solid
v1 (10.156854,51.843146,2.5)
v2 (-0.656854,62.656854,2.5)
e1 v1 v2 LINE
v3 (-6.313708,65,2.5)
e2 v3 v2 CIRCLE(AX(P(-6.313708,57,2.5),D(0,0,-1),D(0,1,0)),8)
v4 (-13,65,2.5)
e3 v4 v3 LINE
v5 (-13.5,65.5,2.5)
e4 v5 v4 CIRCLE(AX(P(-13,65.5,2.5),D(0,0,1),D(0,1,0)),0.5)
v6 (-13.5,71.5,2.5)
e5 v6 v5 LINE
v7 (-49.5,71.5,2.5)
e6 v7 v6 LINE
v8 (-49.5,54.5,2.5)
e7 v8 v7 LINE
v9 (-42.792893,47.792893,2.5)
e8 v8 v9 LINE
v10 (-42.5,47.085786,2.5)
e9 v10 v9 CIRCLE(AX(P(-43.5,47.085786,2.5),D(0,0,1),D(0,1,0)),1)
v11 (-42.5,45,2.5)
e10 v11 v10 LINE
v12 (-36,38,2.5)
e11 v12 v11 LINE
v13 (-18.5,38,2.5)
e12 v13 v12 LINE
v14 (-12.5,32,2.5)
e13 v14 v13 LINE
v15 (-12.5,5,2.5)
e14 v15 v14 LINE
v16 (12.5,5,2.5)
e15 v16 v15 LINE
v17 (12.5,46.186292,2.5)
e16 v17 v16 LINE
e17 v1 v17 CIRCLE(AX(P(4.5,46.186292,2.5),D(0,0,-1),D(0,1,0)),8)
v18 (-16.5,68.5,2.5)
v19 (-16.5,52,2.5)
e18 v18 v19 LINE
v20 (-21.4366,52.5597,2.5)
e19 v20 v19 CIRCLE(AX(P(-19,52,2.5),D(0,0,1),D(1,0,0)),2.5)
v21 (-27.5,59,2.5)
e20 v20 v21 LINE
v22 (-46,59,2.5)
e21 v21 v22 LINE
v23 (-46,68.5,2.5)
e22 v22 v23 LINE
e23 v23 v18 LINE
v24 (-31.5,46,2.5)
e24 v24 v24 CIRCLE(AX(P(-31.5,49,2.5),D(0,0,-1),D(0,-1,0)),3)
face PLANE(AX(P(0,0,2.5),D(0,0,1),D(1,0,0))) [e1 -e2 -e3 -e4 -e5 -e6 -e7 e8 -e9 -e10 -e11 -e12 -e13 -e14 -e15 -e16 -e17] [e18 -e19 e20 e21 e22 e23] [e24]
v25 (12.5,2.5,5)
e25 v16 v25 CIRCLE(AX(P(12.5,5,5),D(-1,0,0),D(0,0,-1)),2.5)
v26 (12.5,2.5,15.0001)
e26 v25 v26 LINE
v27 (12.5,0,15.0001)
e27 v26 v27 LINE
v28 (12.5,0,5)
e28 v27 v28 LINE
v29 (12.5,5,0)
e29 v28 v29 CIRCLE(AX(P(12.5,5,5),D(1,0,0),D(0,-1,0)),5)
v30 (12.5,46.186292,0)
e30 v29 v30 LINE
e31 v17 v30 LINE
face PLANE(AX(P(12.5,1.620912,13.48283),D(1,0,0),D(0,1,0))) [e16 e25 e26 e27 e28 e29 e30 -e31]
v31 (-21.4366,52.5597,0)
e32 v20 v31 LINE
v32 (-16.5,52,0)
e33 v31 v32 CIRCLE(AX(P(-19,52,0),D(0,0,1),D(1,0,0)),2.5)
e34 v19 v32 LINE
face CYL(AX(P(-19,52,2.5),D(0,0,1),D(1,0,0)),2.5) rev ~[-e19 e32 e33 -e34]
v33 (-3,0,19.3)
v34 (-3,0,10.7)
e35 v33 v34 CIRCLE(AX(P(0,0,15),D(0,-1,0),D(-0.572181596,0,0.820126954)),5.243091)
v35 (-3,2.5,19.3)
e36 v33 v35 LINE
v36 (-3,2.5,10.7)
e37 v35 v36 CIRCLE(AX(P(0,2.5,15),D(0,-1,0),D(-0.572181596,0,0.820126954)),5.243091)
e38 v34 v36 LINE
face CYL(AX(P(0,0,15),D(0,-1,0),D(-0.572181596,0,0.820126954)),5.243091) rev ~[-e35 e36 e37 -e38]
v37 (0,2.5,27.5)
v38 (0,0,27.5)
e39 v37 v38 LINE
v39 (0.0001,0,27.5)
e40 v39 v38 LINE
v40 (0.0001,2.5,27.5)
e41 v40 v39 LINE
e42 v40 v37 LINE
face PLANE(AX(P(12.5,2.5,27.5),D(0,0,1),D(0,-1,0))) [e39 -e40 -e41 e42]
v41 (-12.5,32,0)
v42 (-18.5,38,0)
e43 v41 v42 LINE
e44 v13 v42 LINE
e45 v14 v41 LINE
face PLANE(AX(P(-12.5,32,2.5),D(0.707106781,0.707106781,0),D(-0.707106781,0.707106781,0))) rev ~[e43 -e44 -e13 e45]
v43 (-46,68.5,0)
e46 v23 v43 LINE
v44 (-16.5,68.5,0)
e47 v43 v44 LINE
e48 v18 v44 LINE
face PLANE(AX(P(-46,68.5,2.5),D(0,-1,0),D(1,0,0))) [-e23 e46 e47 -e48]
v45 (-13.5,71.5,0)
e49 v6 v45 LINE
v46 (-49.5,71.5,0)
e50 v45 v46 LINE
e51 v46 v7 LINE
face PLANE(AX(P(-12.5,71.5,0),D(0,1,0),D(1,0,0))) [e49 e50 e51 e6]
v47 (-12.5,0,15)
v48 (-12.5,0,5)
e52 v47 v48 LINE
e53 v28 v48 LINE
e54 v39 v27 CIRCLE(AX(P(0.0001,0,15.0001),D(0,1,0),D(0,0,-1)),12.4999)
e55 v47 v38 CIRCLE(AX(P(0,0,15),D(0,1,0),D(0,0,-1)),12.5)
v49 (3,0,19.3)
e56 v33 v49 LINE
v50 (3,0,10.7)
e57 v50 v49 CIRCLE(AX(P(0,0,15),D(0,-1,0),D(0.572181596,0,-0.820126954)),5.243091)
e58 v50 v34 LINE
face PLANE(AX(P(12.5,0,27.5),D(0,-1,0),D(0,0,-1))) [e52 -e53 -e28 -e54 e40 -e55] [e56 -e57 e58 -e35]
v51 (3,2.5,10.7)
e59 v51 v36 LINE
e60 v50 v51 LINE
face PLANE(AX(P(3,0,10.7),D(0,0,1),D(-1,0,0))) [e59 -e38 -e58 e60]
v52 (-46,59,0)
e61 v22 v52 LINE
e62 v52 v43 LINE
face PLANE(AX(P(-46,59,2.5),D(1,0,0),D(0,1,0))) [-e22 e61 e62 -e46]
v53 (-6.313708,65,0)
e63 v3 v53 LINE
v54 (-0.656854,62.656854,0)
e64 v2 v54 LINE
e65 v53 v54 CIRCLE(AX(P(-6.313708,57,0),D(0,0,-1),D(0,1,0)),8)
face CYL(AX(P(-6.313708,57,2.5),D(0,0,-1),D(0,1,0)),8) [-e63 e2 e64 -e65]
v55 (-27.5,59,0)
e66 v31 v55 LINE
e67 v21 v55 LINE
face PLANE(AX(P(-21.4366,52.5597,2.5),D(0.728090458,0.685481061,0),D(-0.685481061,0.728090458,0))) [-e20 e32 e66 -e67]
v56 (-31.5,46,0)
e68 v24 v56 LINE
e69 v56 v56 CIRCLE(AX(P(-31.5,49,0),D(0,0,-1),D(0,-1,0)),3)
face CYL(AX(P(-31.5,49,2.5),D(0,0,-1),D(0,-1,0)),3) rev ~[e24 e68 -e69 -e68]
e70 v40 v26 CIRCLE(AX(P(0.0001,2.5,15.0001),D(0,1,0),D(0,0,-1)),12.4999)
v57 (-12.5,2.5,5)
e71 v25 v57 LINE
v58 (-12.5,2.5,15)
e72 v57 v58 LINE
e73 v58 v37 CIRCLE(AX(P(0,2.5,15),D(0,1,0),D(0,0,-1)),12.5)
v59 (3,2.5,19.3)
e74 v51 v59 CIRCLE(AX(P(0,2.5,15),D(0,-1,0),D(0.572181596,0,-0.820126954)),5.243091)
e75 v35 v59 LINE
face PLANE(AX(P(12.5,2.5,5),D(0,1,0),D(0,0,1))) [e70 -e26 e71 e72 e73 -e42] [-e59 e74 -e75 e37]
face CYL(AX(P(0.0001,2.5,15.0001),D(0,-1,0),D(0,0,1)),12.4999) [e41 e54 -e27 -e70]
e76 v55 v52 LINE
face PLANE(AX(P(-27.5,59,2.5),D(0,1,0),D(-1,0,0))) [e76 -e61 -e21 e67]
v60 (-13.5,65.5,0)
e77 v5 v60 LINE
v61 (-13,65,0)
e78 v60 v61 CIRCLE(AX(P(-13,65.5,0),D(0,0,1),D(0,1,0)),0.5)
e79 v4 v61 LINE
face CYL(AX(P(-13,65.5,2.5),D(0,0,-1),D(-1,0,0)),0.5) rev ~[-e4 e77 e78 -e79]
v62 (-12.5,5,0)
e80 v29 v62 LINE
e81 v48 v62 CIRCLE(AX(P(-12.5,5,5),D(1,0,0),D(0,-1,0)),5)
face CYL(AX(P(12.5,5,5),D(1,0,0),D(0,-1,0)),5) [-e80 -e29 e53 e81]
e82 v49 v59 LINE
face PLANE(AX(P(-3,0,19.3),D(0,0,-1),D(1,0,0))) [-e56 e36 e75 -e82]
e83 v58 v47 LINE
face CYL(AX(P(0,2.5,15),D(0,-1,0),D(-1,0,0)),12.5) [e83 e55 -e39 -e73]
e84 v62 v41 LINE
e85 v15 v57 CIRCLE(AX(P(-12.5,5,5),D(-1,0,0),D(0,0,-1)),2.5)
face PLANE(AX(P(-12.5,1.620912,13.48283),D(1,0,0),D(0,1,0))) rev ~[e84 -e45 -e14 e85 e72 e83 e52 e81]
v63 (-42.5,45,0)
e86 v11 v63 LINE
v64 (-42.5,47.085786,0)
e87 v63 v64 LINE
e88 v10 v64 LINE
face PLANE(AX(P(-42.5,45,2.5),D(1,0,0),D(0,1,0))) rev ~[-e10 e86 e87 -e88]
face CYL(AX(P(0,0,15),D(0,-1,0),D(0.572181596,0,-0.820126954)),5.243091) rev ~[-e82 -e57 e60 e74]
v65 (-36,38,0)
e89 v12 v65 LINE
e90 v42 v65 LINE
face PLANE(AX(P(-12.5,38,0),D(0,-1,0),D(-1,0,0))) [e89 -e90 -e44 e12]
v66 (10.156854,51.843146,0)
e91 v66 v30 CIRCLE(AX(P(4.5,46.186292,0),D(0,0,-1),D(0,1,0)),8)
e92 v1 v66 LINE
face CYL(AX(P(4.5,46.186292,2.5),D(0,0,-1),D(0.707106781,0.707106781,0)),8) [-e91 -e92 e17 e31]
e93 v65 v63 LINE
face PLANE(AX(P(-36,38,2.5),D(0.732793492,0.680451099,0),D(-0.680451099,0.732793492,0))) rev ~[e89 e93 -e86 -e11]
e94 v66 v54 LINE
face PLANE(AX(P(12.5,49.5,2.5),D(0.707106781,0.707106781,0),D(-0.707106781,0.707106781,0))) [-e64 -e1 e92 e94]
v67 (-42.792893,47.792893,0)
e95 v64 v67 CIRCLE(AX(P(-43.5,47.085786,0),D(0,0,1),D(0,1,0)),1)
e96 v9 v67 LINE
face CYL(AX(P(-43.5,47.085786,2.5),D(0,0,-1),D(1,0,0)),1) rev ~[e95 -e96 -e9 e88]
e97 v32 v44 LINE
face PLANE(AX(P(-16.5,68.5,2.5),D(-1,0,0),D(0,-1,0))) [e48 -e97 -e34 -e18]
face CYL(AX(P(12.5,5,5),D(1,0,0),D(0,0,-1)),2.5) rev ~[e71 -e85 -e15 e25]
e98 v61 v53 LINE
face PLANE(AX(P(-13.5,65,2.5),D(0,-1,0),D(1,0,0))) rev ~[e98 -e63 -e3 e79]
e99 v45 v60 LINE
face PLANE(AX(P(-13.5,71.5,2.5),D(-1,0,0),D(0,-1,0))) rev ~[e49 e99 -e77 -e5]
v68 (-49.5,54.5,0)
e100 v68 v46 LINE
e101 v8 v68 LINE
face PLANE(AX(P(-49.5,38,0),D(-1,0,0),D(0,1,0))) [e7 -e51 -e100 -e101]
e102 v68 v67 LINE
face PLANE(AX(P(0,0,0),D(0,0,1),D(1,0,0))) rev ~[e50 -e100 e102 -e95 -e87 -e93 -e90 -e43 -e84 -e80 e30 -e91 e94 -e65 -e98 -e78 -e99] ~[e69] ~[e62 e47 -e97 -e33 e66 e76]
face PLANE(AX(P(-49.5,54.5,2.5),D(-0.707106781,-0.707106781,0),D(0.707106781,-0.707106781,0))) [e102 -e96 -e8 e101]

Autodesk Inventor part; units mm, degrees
ref_plane "YZ Plane" through (0, 0, 0) normal (1, 0, 0) x (0, 1, 0)
ref_plane "XZ Plane" through (0, 0, 0) normal (0, 1, 0) x (-1, 0, 0)
ref_plane "XY Plane" through (0, 0, 0) normal (0, 0, 1) x (1, 0, 0)
sketch "Sketch1" plane through (0, 0, 0) normal (0, 0, 1) x (1, 0, 0)
  line L0 (-12.5, 71.5) -> (12.5, 71.5)
  line L1 (12.5, 71.5) -> (12.5, 0)
  line L2 (12.5, 0) -> (-12.5, 0)
  line L3 (-12.5, 0) -> (-12.5, 71.5)
  line L4 (-49.5, 71.5) -> (12.5, 71.5)
  line L5 (12.5, 71.5) -> (12.5, 38)
  line L6 (12.5, 38) -> (-49.5, 38)
  line L7 (-49.5, 38) -> (-49.5, 71.5)
  point P0 (0, 0)
  point P1 (0, 0)
  dimension "d0" = 25
  dimension "d1" = 71.5
  dimension "d2" = 62
  dimension "d3" = 33.5
extrude "Plate1" add sketch "Sketch1" along normal blind 2.5
sketch "Sketch2" plane through (12.5, 2.5, 0) normal (0, -1, 0) x (1, 0, 0)
  line L0 (-25, 0) -> (0, 0)
  line L1 (0, 0) -> (0, 27.5)
  line L2 (0, 27.5) -> (-25, 27.5)
  line L3 (-25, 27.5) -> (-25, 0)
edge flange "Flange1" height 27.5 angle 90 thickness 2.5 bend radius 2.5 thickness toward (0, -1, 0) relief tear relief width 2.5 relief depth 1.25 edges at (0, 0, 2.5) wall of the first edge with corners at (-12.5, 2.5, 0) (12.5, 2.5, 0) (12.5, 2.5, 27.5) (-12.5, 2.5, 27.5)
bend "Bend1"
corner "Corner1"
fillet "Fillet1" radius 12.5 1 edges at (-12.5, 1.25, 27.5)
fillet "Fillet2" radius 12.5 1 edges at (12.5, 1.25, 27.5)
sketch "Sketch5" plane through (-12.5, 0, 5) normal (0, -1, 0) x (1, 0, 0)
  line L0 (9.5, 14.3) -> (15.5, 14.3)
  line L1 (15.5, 14.3) -> (15.5, 5.7)
  line L2 (15.5, 5.7) -> (9.5, 5.7)
  line L3 (9.5, 5.7) -> (9.5, 14.3)
  arc A0 (25, 10) -> (0, 10) centre (12.5, 10) ccw projected
  arc A1 (9.5, 14.3) -> (9.5, 5.7) centre (12.5, 10) ccw
  arc A2 (15.5, 5.7) -> (15.5, 14.3) centre (12.5, 10) ccw
  line L4 (9.5, 5.7) -> (9.5, 14.3)
  line L5 (15.5, 5.7) -> (15.5, 14.3)
  point P0 (12.5, -5)
  point P1 (12.5, 14.3)
  point P2 (12.5, 22.5)
  dimension "d20" = 8.6
  dimension "d21" = 6
extrude "Cut1" cut sketch "Sketch5" against normal blind 2.5
sketch "Sketch6" plane through (0, 0, 2.5) normal (0, 0, 1) x (1, 0, 0)
  line L0 (12.5, 71.5) -> (-49.5, 71.5) projected
  line L1 (12.5, 71.5) -> (-13.5, 71.5)
  line L2 (-13.5, 71.5) -> (-13.5, 65)
  line L3 (-13.5, 65) -> (12.5, 65)
  line L4 (12.5, 65) -> (12.5, 71.5)
  line L5 (-3, 65) -> (12.5, 65)
  line L6 (12.5, 65) -> (12.5, 49.5)
  line L7 (12.5, 49.5) -> (-3, 65)
  point P0 (0, 0)
  dimension "d24" = 26
  dimension "d25" = 6.5
  dimension "d26" = 15.5
  dimension "d27" = 15.5
extrude "Cut2" cut sketch "Sketch6" against normal blind 2.5
fillet "Fillet3" radius 0.5 1 edges at (-13.5, 65, 1.25)
fillet "Fillet4" radius 8 2 edges at (-3, 65, 1.25) (12.5, 49.5, 1.25)
sketch "Sketch7" plane through (0, 0, 2.5) normal (0, 0, 1) x (1, 0, 0)
  line L0 (-12.5, 38) -> (-49.5, 38)
  line L1 (-12.5, 38) -> (-18.5, 38)
  line L2 (-12.5, 38) -> (-12.5, 32)
  line L3 (-12.5, 5) -> (-12.5, 38)
  line L4 (-12.5, 32) -> (-18.5, 38)
  point P0 (0, 0)
  dimension "d32" = 6
  dimension "d33" = 6
sheet face with bend "Face2" sketch "Sketch7" thickness 2.5 toward (0, 0, -1) bend radius 2.5
bend "Bend2"
sketch "Sketch8" plane through (0, 0, 2.5) normal (0, 0, 1) x (1, 0, 0)
  line L0 (-49.5, 71.5) -> (-49.5, 38) projected
  line L1 (-49.5, 38) -> (-36, 38)
  line L2 (-18.5, 38) -> (-49.5, 38) projected
  line L3 (-49.5, 38) -> (-49.5, 54.5)
  line L4 (-49.5, 54.5) -> (-43, 54.5)
  line L5 (-49.5, 54.5) -> (-49.5, 47.5)
  line L6 (-49.5, 54.5) -> (-42.5, 47.5)
  line L7 (-36, 38) -> (-42.5, 38)
  line L8 (-36, 38) -> (-36, 45)
  line L9 (-36, 38) -> (-42.5, 45)
  line L10 (-42.5, 45) -> (-42.5, 47.5)
  point P0 (0, 0)
  dimension "d39" = 13.5
  dimension "d40" = 16.5
  dimension "d41" = 6.5
  dimension "d42" = 7
  dimension "d43" = 6.5
  dimension "d44" = 7
extrude "Cut3" cut sketch "Sketch8" against normal blind 2.5
fillet "Fillet5" radius 1 1 edges at (-42.5, 47.5, 1.25)
sketch "Sketch9" plane through (0, 0, 2.5) normal (0, 0, 1) x (1, 0, 0)
  line L0 (-49.5, 71.5) -> (-13.5, 71.5) projected
  line L1 (-49.5, 54.5) -> (-49.5, 71.5) projected
  point P0 (0, 0)
  point P1 (-31.5, 49)
  dimension "d48" = 22.5
  dimension "d49" = 18
hole "Hole1" at (-31.5, 49, 2.5) direction (0, 0, -1) diameter 6 end through all
sketch "Sketch10" plane through (0, 0, 2.5) normal (0, 0, 1) x (1, 0, 0)
  line L0 (-46, 68.5) -> (-16.5, 68.5)
  line L1 (-16.5, 68.5) -> (-16.5, 59)
  line L2 (-16.5, 59) -> (-46, 59)
  line L3 (-46, 59) -> (-46, 68.5)
  line L4 (-49.5, 54.5) -> (-49.5, 71.5) projected
  line L5 (-16.5, 59) -> (-27.5, 59)
  line L6 (-16.5, 59) -> (-16.5, 52)
  circle A0 centre (-19, 52) radius 2.5
  line L7 (-49.5, 71.5) -> (-13.5, 71.5) projected
  line L8 (-21.4366, 52.5597) -> (-27.5, 59)
  point P0 (0, 0)
  dimension "d57" = 29.5
  dimension "d58" = 9.5
  dimension "d59" = 3.5
  dimension "d60" = 3
  dimension "d61" = 11
  dimension "d63" = 5
  dimension "d64" = 19.5
  dimension "d65" = 30.5
extrude "Cut4" cut sketch "Sketch10" against normal blind 2.5
equation "\"d22\" = Thickness"
equation "\"d28\" = Thickness"
equation "\"d45\" = Thickness"
equation "\"d55\" = Thickness"
equation "\"d66\" = Thickness"
equation "\"d68\" = Thickness"
equation "\"d5\" = BendReliefWidth"
equation "\"d6\" = BendReliefDepth"
equation "\"d7\" = MinimumRemnant"
equation "\"d8\" = BendRadius"
equation "\"d11\" = BendRadius"
equation "\"d12\" = CornerReliefSize"
equation "\"d13\" = GapSize"
equation "\"d14\" = JacobiRadiusSize"
equation "\"d34\" = BendRadius"
equation "\"d35\" = BendReliefWidth"
equation "\"d37\" = MinimumRemnant"
equation "\"d36\" = BendReliefDepth"
equation "\"d38\" = BendRadius"
equation "\"BendRadius\" = Thickness"
equation "\"BendReliefWidth\" = Thickness"
equation "\"BendReliefDepth\" = 0.5 * Thickness"
equation "\"MinimumRemnant\" = 2 * Thickness"
equation "\"TransitionRadius\" = BendRadius"
equation "\"JacobiRadiusSize\" = BendRadius"
equation "\"GapSize\" = Thickness"
equation "\"d4\" = BendRadius"
equation "\"Thickness\" = 2.5"
equation "\"CornerReliefSize\" = 10"
properties part number "Luxcan P2"
